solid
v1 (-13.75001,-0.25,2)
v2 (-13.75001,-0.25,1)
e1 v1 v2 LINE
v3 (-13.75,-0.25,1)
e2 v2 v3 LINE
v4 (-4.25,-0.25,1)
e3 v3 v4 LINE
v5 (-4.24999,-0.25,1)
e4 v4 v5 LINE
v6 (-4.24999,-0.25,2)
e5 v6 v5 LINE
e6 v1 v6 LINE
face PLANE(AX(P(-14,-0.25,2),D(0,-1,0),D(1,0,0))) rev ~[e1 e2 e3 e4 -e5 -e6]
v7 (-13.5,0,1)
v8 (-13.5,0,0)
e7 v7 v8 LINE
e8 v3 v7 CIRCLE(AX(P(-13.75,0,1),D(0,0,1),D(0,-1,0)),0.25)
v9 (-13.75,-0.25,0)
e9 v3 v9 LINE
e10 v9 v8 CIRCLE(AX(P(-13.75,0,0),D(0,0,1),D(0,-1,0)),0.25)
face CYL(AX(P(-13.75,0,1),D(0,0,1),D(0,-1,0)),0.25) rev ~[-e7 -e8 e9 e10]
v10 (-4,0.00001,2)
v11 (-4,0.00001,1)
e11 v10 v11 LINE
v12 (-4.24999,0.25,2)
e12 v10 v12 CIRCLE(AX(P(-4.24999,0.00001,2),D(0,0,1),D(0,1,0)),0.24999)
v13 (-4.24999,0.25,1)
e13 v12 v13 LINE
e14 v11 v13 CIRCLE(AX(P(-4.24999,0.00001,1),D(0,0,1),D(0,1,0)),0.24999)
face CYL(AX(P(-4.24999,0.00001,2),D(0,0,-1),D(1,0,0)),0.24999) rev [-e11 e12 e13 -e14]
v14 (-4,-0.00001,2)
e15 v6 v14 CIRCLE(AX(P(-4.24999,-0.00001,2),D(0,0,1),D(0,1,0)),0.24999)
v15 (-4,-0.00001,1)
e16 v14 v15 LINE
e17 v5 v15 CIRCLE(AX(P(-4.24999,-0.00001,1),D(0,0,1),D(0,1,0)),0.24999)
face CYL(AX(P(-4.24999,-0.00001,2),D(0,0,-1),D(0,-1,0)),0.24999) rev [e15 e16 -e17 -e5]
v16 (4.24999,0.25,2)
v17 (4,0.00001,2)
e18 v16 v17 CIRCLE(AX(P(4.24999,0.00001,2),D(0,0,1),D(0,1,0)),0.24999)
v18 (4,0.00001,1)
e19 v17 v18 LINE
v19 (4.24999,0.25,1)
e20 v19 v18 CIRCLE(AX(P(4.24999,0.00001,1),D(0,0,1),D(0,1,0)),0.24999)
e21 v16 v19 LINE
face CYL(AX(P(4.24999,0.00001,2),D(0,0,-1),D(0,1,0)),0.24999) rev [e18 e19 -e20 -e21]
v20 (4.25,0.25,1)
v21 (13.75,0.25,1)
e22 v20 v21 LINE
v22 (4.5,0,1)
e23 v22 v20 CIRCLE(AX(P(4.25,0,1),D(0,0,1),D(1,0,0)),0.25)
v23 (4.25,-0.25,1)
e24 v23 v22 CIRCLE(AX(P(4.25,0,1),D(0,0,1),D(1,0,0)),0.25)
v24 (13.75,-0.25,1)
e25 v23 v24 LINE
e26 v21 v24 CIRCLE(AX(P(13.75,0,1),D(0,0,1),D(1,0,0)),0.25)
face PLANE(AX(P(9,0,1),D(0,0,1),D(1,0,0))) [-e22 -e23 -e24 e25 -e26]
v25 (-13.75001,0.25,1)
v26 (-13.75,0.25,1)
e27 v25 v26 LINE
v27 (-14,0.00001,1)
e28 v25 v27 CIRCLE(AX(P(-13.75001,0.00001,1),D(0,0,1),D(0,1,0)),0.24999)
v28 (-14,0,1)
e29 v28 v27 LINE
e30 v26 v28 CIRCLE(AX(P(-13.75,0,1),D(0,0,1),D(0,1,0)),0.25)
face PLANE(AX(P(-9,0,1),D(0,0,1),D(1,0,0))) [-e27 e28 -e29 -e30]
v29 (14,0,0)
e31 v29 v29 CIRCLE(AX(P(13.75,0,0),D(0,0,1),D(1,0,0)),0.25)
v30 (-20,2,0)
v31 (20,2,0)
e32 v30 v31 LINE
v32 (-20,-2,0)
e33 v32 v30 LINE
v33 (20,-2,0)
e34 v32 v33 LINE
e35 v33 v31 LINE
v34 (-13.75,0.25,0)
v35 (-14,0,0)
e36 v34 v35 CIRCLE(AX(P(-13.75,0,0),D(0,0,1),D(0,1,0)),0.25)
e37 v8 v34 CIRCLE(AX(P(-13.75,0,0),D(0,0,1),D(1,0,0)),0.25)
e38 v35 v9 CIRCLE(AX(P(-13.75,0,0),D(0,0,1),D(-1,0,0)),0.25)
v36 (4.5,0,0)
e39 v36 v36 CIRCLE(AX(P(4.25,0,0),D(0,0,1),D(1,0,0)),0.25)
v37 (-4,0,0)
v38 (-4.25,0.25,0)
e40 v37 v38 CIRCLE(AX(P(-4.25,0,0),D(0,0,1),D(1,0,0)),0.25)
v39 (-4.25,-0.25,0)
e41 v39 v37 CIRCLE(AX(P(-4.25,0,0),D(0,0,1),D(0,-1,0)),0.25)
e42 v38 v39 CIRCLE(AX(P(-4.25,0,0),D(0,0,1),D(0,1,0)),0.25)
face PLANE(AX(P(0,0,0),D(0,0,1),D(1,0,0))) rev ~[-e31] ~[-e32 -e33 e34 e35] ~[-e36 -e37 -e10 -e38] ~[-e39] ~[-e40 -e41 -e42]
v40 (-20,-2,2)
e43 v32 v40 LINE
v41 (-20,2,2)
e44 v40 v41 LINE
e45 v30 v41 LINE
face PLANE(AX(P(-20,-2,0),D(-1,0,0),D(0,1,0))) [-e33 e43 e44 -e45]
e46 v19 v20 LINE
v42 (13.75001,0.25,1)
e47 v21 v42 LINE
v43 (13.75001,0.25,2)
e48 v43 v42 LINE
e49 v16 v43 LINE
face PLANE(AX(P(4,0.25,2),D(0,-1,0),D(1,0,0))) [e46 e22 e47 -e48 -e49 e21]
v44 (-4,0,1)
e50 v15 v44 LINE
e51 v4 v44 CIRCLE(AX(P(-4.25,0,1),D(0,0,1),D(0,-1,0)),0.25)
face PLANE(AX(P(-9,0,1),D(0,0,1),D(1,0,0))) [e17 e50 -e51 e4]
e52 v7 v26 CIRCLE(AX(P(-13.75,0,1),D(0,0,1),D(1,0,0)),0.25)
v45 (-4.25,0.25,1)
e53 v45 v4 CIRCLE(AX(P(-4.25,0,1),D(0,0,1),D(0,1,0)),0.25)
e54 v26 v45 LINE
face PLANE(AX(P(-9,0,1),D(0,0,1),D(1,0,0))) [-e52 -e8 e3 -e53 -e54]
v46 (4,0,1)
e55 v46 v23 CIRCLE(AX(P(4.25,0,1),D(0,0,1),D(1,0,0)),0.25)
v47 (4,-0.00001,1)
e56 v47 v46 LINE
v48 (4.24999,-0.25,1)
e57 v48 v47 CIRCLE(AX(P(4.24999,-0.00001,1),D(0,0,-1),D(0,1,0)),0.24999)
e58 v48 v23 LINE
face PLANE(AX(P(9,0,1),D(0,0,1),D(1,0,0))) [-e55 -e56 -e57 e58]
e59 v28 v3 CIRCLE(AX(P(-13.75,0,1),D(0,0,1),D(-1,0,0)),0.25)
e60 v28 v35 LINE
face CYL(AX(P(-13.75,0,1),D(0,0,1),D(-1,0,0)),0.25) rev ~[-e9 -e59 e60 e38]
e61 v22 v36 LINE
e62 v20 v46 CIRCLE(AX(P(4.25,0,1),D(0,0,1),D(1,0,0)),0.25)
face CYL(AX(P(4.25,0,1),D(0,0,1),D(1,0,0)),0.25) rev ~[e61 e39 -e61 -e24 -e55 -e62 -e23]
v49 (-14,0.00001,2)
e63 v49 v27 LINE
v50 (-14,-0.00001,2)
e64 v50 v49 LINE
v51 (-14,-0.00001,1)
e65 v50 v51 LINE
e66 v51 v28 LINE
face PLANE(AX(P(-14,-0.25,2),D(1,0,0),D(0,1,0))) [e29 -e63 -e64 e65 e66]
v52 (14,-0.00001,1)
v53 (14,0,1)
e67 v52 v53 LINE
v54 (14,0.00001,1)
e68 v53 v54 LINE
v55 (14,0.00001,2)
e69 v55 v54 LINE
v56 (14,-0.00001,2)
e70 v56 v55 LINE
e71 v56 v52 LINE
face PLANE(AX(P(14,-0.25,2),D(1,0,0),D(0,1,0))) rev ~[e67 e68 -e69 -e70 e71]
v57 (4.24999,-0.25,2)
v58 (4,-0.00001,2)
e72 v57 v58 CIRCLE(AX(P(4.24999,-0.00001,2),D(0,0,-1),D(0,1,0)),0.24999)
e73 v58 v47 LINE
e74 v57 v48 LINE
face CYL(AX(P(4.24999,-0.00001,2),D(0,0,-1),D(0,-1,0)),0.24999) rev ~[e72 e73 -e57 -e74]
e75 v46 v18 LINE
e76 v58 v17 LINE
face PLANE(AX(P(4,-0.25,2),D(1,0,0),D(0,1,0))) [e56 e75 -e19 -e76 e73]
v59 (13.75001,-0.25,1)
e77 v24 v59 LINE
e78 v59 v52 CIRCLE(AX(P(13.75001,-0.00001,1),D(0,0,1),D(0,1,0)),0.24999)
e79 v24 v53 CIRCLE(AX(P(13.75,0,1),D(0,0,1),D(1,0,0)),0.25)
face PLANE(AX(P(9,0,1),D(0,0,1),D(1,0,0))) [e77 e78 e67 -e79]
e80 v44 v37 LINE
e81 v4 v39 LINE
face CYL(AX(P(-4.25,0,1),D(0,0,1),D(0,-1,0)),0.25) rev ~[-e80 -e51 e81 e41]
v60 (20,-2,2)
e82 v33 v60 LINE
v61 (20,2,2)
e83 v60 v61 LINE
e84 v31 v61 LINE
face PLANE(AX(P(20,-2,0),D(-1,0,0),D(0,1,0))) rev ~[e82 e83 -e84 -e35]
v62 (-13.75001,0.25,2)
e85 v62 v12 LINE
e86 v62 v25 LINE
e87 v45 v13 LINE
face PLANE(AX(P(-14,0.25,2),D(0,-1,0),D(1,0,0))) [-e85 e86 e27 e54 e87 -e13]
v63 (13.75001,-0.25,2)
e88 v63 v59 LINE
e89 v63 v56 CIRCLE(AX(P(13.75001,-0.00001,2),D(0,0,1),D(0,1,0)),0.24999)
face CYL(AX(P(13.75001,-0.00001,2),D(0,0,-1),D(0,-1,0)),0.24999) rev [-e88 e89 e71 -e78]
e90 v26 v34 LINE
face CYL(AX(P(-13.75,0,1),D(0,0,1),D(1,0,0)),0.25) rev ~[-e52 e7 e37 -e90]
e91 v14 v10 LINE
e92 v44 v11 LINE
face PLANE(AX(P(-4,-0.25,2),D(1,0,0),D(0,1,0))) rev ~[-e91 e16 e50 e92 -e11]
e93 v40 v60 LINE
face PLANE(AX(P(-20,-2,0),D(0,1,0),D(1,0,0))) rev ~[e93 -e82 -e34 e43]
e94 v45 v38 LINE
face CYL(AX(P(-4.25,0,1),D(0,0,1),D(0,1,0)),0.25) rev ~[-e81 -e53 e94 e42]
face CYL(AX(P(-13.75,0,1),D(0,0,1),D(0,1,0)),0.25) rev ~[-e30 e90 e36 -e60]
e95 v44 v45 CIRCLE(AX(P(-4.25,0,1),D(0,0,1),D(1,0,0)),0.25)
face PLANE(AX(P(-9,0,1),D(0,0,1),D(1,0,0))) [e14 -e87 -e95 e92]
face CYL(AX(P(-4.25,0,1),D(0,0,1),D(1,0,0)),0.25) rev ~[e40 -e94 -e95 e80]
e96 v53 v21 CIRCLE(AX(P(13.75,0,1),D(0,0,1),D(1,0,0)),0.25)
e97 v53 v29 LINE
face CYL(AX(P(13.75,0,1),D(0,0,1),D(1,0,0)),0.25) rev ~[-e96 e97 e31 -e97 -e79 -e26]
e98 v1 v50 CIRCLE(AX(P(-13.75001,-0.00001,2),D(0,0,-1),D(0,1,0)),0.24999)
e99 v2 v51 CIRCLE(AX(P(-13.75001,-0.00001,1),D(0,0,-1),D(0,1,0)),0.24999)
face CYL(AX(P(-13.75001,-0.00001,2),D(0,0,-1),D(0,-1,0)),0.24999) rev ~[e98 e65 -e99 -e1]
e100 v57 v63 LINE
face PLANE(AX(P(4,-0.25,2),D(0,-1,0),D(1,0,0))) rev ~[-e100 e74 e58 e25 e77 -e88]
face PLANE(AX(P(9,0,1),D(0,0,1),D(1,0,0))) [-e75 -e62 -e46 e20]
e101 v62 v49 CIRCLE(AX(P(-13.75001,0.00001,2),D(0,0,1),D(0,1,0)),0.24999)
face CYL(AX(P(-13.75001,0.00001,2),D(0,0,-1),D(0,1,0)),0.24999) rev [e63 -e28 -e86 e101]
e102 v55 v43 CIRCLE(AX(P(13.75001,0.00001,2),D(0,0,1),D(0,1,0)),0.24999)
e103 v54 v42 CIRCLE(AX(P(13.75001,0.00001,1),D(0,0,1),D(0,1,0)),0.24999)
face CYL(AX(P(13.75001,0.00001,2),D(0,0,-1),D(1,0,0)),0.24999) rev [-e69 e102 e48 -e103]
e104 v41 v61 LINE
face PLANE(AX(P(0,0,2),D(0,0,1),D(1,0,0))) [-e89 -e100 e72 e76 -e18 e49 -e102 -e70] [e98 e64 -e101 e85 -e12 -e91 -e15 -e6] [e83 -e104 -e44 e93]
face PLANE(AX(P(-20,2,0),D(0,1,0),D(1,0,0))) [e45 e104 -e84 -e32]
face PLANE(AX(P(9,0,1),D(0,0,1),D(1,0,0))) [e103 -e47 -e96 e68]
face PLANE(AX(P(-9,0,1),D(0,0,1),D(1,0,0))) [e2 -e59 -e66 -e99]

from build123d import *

# Parameters (mm, degrees)
F0_W     = 40
F0_H     = 4
F1_DEPTH = 2
F2_W     = 10
F2_H     = 0.5
F3_DEPTH = 1
F4_R     = 0.25
F5_DEPTH = 25
F6_R     = 0.24999


# Not quite as in the source:
# - a fillet or chamfer is up to 0.001 mm smaller than in the source, because OpenCascade refuses the exact size


with BuildPart() as f1:
    # F0 (on Top) → F1 (new body)
    with BuildSketch(Plane.XY):
        Rectangle(F0_W, F0_H)
    extrude(amount=F1_DEPTH)

    # F2 (on face) → F3 (cut)
    with BuildSketch(Plane.XY.offset(2)):
        with Locations((-9, 0)):
            Rectangle(F2_W, F2_H)
        with Locations((9, 0)):
            Rectangle(F2_W, F2_H)
    extrude(amount=-F3_DEPTH, mode=Mode.SUBTRACT)

    # F4 (on face) → F5 (cut)
    with BuildSketch(Plane.XY.offset(1)):
        with BuildLine():
            ThreePointArc((-13.75, -0.25), (-13.5732233047, -0.1767766953), (-13.5, 0))
            ThreePointArc((-13.5, 0), (-13.5732233047, 0.1767766953), (-13.75, 0.25))
            ThreePointArc((-13.75, 0.25), (-13.9267766953, 0.1767766953), (-14, 0))
            ThreePointArc((-14, 0), (-13.9267766953, -0.1767766953), (-13.75, -0.25))
        make_face()
        with BuildLine():
            ThreePointArc((-4, 0), (-4.0732233047, 0.1767766953), (-4.25, 0.25))
            ThreePointArc((-4.25, 0.25), (-4.5, 0), (-4.25, -0.25))
            ThreePointArc((-4.25, -0.25), (-4.0732233047, -0.1767766953), (-4, 0))
        make_face()
        with Locations((13.75, 0)):
            Circle(F4_R)
        with Locations((4.25, 0)):
            Circle(F4_R)
    extrude(amount=-F5_DEPTH, mode=Mode.SUBTRACT)

    # F6 (radius 0.25 in the source; OpenCascade refuses exactly that, so slightly less here)
    f6_edges = [f1.edges().sort_by_distance(p)[0] for p in [
        (14, 0.25, 1.5),
        (14, -0.25, 1.5),
        (4, -0.25, 1.5),
        (4, 0.25, 1.5),
        (-14, 0.25, 1.5),
        (-14, -0.25, 1.5),
        (-4, 0.25, 1.5),
        (-4, -0.25, 1.5),
    ]]
    fillet(f6_edges, radius=F6_R)


solid = f1.part
